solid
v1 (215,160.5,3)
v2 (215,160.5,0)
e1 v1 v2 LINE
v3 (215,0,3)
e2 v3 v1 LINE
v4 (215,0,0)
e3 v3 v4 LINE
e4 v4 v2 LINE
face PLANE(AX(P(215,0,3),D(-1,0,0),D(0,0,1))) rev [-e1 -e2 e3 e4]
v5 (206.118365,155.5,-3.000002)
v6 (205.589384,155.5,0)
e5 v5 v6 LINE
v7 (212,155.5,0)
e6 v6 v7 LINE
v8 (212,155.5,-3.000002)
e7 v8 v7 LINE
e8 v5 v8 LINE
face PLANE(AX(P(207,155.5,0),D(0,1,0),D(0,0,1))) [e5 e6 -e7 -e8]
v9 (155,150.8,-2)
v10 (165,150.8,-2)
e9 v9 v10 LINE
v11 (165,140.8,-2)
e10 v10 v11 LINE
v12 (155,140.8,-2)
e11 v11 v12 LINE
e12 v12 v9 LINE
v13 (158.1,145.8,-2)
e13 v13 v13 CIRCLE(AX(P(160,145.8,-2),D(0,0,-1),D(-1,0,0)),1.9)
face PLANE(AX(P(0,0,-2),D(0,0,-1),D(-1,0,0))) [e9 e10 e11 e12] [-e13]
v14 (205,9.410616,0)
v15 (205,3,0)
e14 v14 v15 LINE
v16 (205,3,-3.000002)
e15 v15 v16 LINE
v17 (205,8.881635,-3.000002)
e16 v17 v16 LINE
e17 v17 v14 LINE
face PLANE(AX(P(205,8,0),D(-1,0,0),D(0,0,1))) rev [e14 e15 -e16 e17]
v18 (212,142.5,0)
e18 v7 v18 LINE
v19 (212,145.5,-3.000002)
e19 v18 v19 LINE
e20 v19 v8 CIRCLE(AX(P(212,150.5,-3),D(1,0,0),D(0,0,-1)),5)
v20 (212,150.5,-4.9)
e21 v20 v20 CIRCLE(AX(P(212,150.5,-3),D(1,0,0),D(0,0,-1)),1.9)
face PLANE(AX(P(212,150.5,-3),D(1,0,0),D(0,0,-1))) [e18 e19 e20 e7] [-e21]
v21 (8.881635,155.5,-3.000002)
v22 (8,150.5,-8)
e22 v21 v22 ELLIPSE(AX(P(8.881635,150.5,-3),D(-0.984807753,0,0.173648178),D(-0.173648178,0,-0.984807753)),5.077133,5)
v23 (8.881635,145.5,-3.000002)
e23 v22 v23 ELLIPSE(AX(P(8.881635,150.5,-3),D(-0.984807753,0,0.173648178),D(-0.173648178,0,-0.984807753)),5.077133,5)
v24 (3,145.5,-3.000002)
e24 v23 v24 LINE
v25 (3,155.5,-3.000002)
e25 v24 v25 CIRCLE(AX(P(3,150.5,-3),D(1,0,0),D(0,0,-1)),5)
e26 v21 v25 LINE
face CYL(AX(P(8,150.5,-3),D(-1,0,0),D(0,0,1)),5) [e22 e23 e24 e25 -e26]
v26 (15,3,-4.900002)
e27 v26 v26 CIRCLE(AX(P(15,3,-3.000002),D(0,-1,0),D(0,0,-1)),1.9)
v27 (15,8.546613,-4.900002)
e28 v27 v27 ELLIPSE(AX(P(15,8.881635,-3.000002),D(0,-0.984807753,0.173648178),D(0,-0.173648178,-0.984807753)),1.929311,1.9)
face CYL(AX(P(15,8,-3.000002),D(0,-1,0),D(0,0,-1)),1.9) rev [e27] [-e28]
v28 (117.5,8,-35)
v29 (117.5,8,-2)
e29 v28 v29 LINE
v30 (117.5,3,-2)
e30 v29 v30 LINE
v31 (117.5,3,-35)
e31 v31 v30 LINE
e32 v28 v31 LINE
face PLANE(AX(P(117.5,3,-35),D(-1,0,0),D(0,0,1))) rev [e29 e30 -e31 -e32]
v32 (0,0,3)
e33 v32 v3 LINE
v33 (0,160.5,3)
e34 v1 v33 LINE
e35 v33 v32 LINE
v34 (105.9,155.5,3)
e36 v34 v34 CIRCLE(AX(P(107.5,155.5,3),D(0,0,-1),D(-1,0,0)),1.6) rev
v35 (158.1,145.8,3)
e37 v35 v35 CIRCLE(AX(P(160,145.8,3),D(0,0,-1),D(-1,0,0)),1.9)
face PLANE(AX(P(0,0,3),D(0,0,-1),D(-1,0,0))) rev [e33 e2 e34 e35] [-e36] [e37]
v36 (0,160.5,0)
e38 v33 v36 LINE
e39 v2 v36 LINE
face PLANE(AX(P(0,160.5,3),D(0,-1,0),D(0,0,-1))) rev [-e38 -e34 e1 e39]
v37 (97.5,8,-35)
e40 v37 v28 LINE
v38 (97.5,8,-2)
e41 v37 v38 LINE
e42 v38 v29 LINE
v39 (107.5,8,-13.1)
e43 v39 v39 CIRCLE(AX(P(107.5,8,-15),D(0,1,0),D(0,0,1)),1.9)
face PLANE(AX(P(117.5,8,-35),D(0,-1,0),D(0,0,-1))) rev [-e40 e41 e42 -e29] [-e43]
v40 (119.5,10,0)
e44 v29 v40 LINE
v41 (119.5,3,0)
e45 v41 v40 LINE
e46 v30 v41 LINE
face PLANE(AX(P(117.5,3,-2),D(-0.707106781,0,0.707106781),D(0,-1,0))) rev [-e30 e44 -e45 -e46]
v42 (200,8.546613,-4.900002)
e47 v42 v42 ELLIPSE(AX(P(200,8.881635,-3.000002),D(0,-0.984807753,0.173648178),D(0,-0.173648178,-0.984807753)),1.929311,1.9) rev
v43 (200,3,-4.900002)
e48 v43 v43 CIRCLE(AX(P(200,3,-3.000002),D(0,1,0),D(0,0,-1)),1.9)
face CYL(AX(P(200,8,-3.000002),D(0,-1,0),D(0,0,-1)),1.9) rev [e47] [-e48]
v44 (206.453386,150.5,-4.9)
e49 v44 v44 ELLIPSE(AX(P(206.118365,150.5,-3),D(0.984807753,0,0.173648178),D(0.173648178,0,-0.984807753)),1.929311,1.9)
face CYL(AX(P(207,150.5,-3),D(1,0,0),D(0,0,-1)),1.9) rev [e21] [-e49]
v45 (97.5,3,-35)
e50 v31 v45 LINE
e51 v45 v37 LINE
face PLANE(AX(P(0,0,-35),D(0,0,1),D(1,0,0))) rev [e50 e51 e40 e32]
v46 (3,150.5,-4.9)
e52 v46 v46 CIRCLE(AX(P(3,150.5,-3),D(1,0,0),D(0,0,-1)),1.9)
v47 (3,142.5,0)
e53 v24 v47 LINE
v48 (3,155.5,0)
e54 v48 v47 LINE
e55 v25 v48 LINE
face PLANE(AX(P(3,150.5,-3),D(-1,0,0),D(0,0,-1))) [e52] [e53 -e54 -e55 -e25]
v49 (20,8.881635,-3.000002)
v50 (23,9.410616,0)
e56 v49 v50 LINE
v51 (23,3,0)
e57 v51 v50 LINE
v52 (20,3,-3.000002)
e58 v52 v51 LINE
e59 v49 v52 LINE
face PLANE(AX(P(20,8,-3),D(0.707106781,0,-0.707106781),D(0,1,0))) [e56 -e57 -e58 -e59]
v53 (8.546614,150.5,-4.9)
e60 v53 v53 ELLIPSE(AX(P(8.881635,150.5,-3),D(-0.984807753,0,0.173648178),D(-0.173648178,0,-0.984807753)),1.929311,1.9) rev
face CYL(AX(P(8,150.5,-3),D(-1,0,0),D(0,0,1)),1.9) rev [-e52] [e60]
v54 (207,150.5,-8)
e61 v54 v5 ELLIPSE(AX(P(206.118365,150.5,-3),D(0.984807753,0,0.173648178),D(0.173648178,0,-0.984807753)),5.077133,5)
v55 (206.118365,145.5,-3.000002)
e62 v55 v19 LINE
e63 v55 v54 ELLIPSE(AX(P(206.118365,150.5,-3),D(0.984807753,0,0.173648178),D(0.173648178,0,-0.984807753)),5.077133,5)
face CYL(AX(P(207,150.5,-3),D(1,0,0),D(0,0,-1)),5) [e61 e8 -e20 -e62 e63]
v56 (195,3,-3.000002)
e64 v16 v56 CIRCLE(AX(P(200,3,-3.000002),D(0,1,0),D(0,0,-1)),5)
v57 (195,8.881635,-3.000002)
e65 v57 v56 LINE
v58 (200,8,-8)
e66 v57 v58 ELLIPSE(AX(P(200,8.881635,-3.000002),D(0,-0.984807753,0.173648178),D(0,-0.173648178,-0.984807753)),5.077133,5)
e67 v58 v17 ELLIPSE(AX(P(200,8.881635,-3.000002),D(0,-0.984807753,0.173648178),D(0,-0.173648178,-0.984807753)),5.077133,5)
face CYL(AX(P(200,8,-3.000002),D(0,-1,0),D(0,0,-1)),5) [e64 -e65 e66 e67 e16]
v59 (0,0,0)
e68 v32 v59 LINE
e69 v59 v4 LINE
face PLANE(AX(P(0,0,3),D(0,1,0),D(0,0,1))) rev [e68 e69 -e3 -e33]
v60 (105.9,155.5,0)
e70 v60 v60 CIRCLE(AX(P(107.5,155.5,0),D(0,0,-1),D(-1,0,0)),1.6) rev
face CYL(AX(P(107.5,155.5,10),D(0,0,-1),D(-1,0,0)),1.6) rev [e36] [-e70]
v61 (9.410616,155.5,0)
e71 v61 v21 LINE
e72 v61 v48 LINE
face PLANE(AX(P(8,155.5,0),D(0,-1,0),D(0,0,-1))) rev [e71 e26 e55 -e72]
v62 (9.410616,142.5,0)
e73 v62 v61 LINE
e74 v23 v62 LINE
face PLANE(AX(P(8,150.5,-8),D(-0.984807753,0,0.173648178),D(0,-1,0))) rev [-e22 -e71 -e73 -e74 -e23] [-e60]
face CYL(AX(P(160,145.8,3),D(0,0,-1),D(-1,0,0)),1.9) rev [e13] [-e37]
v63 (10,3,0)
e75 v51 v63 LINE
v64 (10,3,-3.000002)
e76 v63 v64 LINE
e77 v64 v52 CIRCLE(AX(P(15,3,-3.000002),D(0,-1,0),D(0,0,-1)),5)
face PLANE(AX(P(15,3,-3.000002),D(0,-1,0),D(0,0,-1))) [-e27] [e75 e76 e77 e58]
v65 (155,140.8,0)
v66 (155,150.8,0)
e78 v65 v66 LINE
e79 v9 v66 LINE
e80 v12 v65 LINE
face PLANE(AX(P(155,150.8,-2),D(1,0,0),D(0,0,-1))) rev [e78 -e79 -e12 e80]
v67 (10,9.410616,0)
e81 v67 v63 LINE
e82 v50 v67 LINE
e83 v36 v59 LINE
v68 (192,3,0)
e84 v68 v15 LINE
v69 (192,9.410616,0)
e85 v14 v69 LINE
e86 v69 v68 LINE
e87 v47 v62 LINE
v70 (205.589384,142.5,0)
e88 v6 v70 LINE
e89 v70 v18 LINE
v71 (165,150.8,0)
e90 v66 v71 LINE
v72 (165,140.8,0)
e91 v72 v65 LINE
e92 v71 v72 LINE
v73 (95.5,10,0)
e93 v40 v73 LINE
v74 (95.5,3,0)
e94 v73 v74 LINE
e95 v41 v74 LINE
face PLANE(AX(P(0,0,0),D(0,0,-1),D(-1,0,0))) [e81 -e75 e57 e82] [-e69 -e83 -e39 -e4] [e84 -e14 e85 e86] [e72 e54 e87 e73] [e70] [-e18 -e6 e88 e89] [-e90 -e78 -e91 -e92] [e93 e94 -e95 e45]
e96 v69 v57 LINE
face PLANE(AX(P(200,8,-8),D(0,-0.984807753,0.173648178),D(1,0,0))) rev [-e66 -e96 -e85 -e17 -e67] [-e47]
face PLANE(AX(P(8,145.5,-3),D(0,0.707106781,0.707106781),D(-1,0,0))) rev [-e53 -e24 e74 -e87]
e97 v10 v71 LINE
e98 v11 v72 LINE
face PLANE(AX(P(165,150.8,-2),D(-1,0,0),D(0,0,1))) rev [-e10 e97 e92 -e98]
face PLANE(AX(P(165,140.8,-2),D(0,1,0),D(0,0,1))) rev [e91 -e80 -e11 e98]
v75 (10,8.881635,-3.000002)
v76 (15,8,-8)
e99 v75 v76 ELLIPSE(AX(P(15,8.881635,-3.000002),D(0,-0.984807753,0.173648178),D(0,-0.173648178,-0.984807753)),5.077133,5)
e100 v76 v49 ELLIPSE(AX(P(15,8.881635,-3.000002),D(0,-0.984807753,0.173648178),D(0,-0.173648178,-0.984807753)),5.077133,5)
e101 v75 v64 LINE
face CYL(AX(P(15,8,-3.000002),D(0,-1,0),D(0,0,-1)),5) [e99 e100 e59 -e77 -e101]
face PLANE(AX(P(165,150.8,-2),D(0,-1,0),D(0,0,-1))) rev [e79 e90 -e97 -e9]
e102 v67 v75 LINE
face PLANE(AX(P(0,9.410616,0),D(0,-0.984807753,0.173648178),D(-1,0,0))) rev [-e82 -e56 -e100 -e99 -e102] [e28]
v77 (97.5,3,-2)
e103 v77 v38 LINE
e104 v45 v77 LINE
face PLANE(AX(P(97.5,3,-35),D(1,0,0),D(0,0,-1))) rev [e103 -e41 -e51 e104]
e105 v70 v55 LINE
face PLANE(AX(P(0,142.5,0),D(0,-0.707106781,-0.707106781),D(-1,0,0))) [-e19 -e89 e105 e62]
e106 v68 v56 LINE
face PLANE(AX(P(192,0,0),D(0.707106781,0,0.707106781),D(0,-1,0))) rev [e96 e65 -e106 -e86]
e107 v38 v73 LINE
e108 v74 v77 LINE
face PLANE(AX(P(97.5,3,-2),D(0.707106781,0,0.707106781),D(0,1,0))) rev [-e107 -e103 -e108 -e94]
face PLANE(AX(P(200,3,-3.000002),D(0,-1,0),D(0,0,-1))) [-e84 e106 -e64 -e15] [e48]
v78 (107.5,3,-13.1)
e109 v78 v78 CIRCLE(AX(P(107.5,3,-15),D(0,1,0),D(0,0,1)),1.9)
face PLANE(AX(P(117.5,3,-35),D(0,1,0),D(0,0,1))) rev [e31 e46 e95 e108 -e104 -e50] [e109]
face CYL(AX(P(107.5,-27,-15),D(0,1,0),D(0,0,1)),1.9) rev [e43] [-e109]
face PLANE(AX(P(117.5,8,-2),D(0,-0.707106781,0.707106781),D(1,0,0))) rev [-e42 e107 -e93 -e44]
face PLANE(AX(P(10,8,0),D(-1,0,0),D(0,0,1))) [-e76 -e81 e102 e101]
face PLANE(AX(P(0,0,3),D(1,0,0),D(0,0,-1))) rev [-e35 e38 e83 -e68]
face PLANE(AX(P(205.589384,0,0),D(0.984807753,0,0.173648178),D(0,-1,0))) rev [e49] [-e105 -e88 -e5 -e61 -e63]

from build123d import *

# Parameters (mm, degrees)
SZKIC1_W                    = 215
SZKIC1_H                    = 160.5
DODANIE_WYCI_GNI_CIE1_DEPTH = 3
DODANIE_WYCI_GNI_CIE2_START = -3
SZKIC2_R                    = 1.9
DODANIE_WYCI_GNI_CIE2_DEPTH = 5
DODANIE_WYCI_GNI_CIE3_START = -3
SZKIC3_R                    = 1.9
DODANIE_WYCI_GNI_CIE3_DEPTH = 5
SFAZOWANIE1_SIZE            = 3
SFAZOWANIE2_START           = 8
SFAZOWANIE2_OUTLINE_R       = 1.9
SFAZOWANIE2_DEPTH           = 1.410615846
SFAZOWANIE2_START_2         = 205.589384154
SFAZOWANIE2_2_OUTLINE_R     = 1.9
SFAZOWANIE2_2_DEPTH         = 1.410615846
SFAZOWANIE2_START_3         = 10
SFAZOWANIE2_3_DEPTH         = 13
SFAZOWANIE2_START_4         = 192
SFAZOWANIE2_4_DEPTH         = 13
SFAZOWANIE2_5_OUTLINE_R     = 1.9
SFAZOWANIE2_5_DEPTH         = 148
SZKIC4_R                    = 1.6
WYTNIJ_WYCI_GNI_CIE1_DEPTH  = 10
SZKIC5_W                    = 20
SZKIC5_H                    = 5
DODANIE_WYCI_GNI_CIE4_DEPTH = 35
SZKIC6_R                    = 1.9
WYTNIJ_WYCI_GNI_CIE2_DEPTH  = 35
SFAZOWANIE3_SIZE            = 2
SZKIC7_W                    = 10
SZKIC7_H                    = 10
DODANIE_WYCI_GNI_CIE5_DEPTH = 2
SZKIC8_R                    = 1.9
WYTNIJ_WYCI_GNI_CIE3_DEPTH  = 271.32249259


with BuildPart() as part:
    # Szkic1 → Dodanie-wyciągnięcie1 (new body)
    with BuildSketch(Plane.XY):
        with Locations((107.5, 80.25)):
            Rectangle(SZKIC1_W, SZKIC1_H)
    extrude(amount=DODANIE_WYCI_GNI_CIE1_DEPTH)

    # Szkic2 → Dodanie-wyciągnięcie2 (add)
    with BuildSketch(Plane(origin=(215, 0, 0), x_dir=(0, 0, -1), z_dir=(1, 0, 0)).offset(DODANIE_WYCI_GNI_CIE2_START)):
        with BuildLine():
            Line((0, 155.5), (3.000001535, 155.5))
            ThreePointArc((3.000001535, 155.5), (8, 150.5), (3.000001535, 145.5))
            Line((3.000001535, 145.5), (0, 145.5))
            Line((0, 145.5), (0, 155.5))
        make_face()
        with Locations((3, 150.5)):
            Circle(SZKIC2_R, mode=Mode.SUBTRACT)
    dodanie_wyci_gni_cie2 = extrude(amount=-DODANIE_WYCI_GNI_CIE2_DEPTH)

    # Lustro1: Dodanie-wyciągnięcie2 across plane
    add(dodanie_wyci_gni_cie2.mirror(Plane.ZY.offset(-107.5)))

    # Szkic3 → Dodanie-wyciągnięcie3 (add)
    with BuildSketch(Plane.XZ.offset(DODANIE_WYCI_GNI_CIE3_START)):
        with BuildLine():
            Line((10, 0), (20, 0))
            Line((20, 0), (20, -3.000001569))
            ThreePointArc((20, -3.000001569), (15, -8.000001569), (10, -3.000001569))
            Line((10, -3.000001569), (10, 0))
        make_face()
        with Locations(Location((15, -3.000001569, 0), (0, 0, 270))):
            Circle(SZKIC3_R, mode=Mode.SUBTRACT)
    dodanie_wyci_gni_cie3 = extrude(amount=-DODANIE_WYCI_GNI_CIE3_DEPTH)

    # Lustro2: Dodanie-wyciągnięcie3 across plane
    add(dodanie_wyci_gni_cie3.mirror(Plane.ZY.offset(-107.5)))

    # Sfazowanie1
    sfazowanie1_edges = [part.edges().sort_by_distance(p)[0] for p in [
        (195, 5.5, 0),
        (20, 5.5, 0),
        (5.5, 145.5, 0),
        (209.5, 145.5, 0),
    ]]
    chamfer(sfazowanie1_edges, length=SFAZOWANIE1_SIZE)

    # Sfazowanie2: read off the stored shape, not the designer's step
    # Sfazowanie2 outline → Sfazowanie2 (add)
    with BuildSketch(Plane.YZ.offset(SFAZOWANIE2_START)):
        with BuildLine():
            ThreePointArc((145.5, -3.000001489), (150.499999977, -8), (155.5, -3.000001535))
            Line((155.5, -3.000001535), (155.5, 0))
            Line((155.5, 0), (142.5, 0))
            Line((142.5, 0), (145.5, -3.000001489))
        make_face()
        with Locations((150.5, -3)):
            Circle(SFAZOWANIE2_OUTLINE_R, mode=Mode.SUBTRACT)
    extrude(amount=SFAZOWANIE2_DEPTH)

    # Sfazowanie2 2 outline → Sfazowanie2 2 (add)
    with BuildSketch(Plane.YZ.offset(SFAZOWANIE2_START_2)):
        with BuildLine():
            ThreePointArc((145.5, -3.000001489), (150.499999977, -8), (155.5, -3.000001535))
            Line((155.5, -3.000001535), (155.5, 0))
            Line((155.5, 0), (142.5, 0))
            Line((142.5, 0), (145.5, -3.000001489))
        make_face()
        with Locations((150.5, -3)):
            Circle(SFAZOWANIE2_2_OUTLINE_R, mode=Mode.SUBTRACT)
    extrude(amount=SFAZOWANIE2_2_DEPTH)

    # Sfazowanie2 3 outline → Sfazowanie2 3 (add)
    with BuildSketch(Plane.YZ.offset(SFAZOWANIE2_START_3)):
        Polygon((8, -8), (9.410615846, 0), (8, 0), align=None)
    extrude(amount=SFAZOWANIE2_3_DEPTH)

    # Sfazowanie2 4 outline → Sfazowanie2 4 (add)
    with BuildSketch(Plane.YZ.offset(SFAZOWANIE2_START_4)):
        Polygon((8, -8), (9.410615846, 0), (8, 0), align=None)
    extrude(amount=SFAZOWANIE2_4_DEPTH)

    # Sfazowanie2 5 outline → Sfazowanie2 5 (cut)
    with BuildSketch(Plane(origin=(0, 0, 0), x_dir=(1, 0, 0), z_dir=(0, 1, 0)).offset(SFAZOWANIE2_START)):
        with BuildLine():
            Line((10, 10), (10, 3.000001569))
            ThreePointArc((10, 3.000001569), (15.000000024, 8.000001569), (20, 3.000001521))
            Line((20, 3.000001521), (23, 0))
            Line((23, 0), (23, 10))
            Line((23, 10), (10, 10))
        make_face()
        Polygon((9.410615846, 0), (9.410615846, 10), (7.647346039, 10), (8, 8), align=None)
        with BuildLine():
            Line((205, 10), (192, 10))
            Line((192, 10), (192, 0))
            Line((192, 0), (195, 3.000001521))
            ThreePointArc((195, 3.000001521), (199.999999976, 8.000001569), (205, 3.000001569))
            Line((205, 3.000001569), (205, 10))
        make_face()
        Polygon((207.352653962, 10), (205.589384154, 10), (205.589384154, 0), (207, 8), align=None)
        with Locations((15, 3.000001569)):
            Circle(SFAZOWANIE2_5_OUTLINE_R)
        with Locations((200, 3.000001569)):
            Circle(SFAZOWANIE2_5_OUTLINE_R)
    extrude(amount=SFAZOWANIE2_5_DEPTH, mode=Mode.SUBTRACT)

    # Szkic4 → Wytnij-wyciągnięcie1 (cut)
    with BuildSketch(Plane(origin=(0, 0, 0), x_dir=(-1, 0, 0), z_dir=(0, 0, -1))):
        with Locations((-107.5, 155.5)):
            Circle(SZKIC4_R)
    extrude(amount=-WYTNIJ_WYCI_GNI_CIE1_DEPTH, mode=Mode.SUBTRACT)

    # Szkic5 → Dodanie-wyciągnięcie4 (add)
    with BuildSketch(Plane(origin=(0, 0, 0), x_dir=(-1, 0, 0), z_dir=(0, 0, -1))):
        with Locations((-107.5, 5.5)):
            Rectangle(SZKIC5_W, SZKIC5_H)
    extrude(amount=DODANIE_WYCI_GNI_CIE4_DEPTH)

    # Szkic6 → Wytnij-wyciągnięcie2 (cut)
    with BuildSketch(Plane(origin=(0, 8, 0), x_dir=(1, 0, 0), z_dir=(0, 1, 0))):
        with Locations(Location((107.5, 15, 0), (0, 0, 270))):
            Circle(SZKIC6_R)
    extrude(amount=-WYTNIJ_WYCI_GNI_CIE2_DEPTH, mode=Mode.SUBTRACT)

    # Sfazowanie3
    sfazowanie3_edges = [part.edges().sort_by_distance(p)[0] for p in [
        (117.5, 5.5, 0),
        (97.5, 5.5, 0),
        (107.5, 8, 0),
    ]]
    chamfer(sfazowanie3_edges, length=SFAZOWANIE3_SIZE)

    # Szkic7 → Dodanie-wyciągnięcie5 (add)
    with BuildSketch(Plane(origin=(0, 0, 0), x_dir=(-1, 0, 0), z_dir=(0, 0, -1))):
        with Locations((-160, 145.8)):
            Rectangle(SZKIC7_W, SZKIC7_H)
    extrude(amount=DODANIE_WYCI_GNI_CIE5_DEPTH)

    # Szkic8 → Wytnij-wyciągnięcie3 (cut, through all)
    with BuildSketch(Plane(origin=(0, 0, -2), x_dir=(-1, 0, 0), z_dir=(0, 0, -1))):
        with Locations((-160, 145.8)):
            Circle(SZKIC8_R)
    extrude(amount=-WYTNIJ_WYCI_GNI_CIE3_DEPTH, mode=Mode.SUBTRACT)


solid = part.part
